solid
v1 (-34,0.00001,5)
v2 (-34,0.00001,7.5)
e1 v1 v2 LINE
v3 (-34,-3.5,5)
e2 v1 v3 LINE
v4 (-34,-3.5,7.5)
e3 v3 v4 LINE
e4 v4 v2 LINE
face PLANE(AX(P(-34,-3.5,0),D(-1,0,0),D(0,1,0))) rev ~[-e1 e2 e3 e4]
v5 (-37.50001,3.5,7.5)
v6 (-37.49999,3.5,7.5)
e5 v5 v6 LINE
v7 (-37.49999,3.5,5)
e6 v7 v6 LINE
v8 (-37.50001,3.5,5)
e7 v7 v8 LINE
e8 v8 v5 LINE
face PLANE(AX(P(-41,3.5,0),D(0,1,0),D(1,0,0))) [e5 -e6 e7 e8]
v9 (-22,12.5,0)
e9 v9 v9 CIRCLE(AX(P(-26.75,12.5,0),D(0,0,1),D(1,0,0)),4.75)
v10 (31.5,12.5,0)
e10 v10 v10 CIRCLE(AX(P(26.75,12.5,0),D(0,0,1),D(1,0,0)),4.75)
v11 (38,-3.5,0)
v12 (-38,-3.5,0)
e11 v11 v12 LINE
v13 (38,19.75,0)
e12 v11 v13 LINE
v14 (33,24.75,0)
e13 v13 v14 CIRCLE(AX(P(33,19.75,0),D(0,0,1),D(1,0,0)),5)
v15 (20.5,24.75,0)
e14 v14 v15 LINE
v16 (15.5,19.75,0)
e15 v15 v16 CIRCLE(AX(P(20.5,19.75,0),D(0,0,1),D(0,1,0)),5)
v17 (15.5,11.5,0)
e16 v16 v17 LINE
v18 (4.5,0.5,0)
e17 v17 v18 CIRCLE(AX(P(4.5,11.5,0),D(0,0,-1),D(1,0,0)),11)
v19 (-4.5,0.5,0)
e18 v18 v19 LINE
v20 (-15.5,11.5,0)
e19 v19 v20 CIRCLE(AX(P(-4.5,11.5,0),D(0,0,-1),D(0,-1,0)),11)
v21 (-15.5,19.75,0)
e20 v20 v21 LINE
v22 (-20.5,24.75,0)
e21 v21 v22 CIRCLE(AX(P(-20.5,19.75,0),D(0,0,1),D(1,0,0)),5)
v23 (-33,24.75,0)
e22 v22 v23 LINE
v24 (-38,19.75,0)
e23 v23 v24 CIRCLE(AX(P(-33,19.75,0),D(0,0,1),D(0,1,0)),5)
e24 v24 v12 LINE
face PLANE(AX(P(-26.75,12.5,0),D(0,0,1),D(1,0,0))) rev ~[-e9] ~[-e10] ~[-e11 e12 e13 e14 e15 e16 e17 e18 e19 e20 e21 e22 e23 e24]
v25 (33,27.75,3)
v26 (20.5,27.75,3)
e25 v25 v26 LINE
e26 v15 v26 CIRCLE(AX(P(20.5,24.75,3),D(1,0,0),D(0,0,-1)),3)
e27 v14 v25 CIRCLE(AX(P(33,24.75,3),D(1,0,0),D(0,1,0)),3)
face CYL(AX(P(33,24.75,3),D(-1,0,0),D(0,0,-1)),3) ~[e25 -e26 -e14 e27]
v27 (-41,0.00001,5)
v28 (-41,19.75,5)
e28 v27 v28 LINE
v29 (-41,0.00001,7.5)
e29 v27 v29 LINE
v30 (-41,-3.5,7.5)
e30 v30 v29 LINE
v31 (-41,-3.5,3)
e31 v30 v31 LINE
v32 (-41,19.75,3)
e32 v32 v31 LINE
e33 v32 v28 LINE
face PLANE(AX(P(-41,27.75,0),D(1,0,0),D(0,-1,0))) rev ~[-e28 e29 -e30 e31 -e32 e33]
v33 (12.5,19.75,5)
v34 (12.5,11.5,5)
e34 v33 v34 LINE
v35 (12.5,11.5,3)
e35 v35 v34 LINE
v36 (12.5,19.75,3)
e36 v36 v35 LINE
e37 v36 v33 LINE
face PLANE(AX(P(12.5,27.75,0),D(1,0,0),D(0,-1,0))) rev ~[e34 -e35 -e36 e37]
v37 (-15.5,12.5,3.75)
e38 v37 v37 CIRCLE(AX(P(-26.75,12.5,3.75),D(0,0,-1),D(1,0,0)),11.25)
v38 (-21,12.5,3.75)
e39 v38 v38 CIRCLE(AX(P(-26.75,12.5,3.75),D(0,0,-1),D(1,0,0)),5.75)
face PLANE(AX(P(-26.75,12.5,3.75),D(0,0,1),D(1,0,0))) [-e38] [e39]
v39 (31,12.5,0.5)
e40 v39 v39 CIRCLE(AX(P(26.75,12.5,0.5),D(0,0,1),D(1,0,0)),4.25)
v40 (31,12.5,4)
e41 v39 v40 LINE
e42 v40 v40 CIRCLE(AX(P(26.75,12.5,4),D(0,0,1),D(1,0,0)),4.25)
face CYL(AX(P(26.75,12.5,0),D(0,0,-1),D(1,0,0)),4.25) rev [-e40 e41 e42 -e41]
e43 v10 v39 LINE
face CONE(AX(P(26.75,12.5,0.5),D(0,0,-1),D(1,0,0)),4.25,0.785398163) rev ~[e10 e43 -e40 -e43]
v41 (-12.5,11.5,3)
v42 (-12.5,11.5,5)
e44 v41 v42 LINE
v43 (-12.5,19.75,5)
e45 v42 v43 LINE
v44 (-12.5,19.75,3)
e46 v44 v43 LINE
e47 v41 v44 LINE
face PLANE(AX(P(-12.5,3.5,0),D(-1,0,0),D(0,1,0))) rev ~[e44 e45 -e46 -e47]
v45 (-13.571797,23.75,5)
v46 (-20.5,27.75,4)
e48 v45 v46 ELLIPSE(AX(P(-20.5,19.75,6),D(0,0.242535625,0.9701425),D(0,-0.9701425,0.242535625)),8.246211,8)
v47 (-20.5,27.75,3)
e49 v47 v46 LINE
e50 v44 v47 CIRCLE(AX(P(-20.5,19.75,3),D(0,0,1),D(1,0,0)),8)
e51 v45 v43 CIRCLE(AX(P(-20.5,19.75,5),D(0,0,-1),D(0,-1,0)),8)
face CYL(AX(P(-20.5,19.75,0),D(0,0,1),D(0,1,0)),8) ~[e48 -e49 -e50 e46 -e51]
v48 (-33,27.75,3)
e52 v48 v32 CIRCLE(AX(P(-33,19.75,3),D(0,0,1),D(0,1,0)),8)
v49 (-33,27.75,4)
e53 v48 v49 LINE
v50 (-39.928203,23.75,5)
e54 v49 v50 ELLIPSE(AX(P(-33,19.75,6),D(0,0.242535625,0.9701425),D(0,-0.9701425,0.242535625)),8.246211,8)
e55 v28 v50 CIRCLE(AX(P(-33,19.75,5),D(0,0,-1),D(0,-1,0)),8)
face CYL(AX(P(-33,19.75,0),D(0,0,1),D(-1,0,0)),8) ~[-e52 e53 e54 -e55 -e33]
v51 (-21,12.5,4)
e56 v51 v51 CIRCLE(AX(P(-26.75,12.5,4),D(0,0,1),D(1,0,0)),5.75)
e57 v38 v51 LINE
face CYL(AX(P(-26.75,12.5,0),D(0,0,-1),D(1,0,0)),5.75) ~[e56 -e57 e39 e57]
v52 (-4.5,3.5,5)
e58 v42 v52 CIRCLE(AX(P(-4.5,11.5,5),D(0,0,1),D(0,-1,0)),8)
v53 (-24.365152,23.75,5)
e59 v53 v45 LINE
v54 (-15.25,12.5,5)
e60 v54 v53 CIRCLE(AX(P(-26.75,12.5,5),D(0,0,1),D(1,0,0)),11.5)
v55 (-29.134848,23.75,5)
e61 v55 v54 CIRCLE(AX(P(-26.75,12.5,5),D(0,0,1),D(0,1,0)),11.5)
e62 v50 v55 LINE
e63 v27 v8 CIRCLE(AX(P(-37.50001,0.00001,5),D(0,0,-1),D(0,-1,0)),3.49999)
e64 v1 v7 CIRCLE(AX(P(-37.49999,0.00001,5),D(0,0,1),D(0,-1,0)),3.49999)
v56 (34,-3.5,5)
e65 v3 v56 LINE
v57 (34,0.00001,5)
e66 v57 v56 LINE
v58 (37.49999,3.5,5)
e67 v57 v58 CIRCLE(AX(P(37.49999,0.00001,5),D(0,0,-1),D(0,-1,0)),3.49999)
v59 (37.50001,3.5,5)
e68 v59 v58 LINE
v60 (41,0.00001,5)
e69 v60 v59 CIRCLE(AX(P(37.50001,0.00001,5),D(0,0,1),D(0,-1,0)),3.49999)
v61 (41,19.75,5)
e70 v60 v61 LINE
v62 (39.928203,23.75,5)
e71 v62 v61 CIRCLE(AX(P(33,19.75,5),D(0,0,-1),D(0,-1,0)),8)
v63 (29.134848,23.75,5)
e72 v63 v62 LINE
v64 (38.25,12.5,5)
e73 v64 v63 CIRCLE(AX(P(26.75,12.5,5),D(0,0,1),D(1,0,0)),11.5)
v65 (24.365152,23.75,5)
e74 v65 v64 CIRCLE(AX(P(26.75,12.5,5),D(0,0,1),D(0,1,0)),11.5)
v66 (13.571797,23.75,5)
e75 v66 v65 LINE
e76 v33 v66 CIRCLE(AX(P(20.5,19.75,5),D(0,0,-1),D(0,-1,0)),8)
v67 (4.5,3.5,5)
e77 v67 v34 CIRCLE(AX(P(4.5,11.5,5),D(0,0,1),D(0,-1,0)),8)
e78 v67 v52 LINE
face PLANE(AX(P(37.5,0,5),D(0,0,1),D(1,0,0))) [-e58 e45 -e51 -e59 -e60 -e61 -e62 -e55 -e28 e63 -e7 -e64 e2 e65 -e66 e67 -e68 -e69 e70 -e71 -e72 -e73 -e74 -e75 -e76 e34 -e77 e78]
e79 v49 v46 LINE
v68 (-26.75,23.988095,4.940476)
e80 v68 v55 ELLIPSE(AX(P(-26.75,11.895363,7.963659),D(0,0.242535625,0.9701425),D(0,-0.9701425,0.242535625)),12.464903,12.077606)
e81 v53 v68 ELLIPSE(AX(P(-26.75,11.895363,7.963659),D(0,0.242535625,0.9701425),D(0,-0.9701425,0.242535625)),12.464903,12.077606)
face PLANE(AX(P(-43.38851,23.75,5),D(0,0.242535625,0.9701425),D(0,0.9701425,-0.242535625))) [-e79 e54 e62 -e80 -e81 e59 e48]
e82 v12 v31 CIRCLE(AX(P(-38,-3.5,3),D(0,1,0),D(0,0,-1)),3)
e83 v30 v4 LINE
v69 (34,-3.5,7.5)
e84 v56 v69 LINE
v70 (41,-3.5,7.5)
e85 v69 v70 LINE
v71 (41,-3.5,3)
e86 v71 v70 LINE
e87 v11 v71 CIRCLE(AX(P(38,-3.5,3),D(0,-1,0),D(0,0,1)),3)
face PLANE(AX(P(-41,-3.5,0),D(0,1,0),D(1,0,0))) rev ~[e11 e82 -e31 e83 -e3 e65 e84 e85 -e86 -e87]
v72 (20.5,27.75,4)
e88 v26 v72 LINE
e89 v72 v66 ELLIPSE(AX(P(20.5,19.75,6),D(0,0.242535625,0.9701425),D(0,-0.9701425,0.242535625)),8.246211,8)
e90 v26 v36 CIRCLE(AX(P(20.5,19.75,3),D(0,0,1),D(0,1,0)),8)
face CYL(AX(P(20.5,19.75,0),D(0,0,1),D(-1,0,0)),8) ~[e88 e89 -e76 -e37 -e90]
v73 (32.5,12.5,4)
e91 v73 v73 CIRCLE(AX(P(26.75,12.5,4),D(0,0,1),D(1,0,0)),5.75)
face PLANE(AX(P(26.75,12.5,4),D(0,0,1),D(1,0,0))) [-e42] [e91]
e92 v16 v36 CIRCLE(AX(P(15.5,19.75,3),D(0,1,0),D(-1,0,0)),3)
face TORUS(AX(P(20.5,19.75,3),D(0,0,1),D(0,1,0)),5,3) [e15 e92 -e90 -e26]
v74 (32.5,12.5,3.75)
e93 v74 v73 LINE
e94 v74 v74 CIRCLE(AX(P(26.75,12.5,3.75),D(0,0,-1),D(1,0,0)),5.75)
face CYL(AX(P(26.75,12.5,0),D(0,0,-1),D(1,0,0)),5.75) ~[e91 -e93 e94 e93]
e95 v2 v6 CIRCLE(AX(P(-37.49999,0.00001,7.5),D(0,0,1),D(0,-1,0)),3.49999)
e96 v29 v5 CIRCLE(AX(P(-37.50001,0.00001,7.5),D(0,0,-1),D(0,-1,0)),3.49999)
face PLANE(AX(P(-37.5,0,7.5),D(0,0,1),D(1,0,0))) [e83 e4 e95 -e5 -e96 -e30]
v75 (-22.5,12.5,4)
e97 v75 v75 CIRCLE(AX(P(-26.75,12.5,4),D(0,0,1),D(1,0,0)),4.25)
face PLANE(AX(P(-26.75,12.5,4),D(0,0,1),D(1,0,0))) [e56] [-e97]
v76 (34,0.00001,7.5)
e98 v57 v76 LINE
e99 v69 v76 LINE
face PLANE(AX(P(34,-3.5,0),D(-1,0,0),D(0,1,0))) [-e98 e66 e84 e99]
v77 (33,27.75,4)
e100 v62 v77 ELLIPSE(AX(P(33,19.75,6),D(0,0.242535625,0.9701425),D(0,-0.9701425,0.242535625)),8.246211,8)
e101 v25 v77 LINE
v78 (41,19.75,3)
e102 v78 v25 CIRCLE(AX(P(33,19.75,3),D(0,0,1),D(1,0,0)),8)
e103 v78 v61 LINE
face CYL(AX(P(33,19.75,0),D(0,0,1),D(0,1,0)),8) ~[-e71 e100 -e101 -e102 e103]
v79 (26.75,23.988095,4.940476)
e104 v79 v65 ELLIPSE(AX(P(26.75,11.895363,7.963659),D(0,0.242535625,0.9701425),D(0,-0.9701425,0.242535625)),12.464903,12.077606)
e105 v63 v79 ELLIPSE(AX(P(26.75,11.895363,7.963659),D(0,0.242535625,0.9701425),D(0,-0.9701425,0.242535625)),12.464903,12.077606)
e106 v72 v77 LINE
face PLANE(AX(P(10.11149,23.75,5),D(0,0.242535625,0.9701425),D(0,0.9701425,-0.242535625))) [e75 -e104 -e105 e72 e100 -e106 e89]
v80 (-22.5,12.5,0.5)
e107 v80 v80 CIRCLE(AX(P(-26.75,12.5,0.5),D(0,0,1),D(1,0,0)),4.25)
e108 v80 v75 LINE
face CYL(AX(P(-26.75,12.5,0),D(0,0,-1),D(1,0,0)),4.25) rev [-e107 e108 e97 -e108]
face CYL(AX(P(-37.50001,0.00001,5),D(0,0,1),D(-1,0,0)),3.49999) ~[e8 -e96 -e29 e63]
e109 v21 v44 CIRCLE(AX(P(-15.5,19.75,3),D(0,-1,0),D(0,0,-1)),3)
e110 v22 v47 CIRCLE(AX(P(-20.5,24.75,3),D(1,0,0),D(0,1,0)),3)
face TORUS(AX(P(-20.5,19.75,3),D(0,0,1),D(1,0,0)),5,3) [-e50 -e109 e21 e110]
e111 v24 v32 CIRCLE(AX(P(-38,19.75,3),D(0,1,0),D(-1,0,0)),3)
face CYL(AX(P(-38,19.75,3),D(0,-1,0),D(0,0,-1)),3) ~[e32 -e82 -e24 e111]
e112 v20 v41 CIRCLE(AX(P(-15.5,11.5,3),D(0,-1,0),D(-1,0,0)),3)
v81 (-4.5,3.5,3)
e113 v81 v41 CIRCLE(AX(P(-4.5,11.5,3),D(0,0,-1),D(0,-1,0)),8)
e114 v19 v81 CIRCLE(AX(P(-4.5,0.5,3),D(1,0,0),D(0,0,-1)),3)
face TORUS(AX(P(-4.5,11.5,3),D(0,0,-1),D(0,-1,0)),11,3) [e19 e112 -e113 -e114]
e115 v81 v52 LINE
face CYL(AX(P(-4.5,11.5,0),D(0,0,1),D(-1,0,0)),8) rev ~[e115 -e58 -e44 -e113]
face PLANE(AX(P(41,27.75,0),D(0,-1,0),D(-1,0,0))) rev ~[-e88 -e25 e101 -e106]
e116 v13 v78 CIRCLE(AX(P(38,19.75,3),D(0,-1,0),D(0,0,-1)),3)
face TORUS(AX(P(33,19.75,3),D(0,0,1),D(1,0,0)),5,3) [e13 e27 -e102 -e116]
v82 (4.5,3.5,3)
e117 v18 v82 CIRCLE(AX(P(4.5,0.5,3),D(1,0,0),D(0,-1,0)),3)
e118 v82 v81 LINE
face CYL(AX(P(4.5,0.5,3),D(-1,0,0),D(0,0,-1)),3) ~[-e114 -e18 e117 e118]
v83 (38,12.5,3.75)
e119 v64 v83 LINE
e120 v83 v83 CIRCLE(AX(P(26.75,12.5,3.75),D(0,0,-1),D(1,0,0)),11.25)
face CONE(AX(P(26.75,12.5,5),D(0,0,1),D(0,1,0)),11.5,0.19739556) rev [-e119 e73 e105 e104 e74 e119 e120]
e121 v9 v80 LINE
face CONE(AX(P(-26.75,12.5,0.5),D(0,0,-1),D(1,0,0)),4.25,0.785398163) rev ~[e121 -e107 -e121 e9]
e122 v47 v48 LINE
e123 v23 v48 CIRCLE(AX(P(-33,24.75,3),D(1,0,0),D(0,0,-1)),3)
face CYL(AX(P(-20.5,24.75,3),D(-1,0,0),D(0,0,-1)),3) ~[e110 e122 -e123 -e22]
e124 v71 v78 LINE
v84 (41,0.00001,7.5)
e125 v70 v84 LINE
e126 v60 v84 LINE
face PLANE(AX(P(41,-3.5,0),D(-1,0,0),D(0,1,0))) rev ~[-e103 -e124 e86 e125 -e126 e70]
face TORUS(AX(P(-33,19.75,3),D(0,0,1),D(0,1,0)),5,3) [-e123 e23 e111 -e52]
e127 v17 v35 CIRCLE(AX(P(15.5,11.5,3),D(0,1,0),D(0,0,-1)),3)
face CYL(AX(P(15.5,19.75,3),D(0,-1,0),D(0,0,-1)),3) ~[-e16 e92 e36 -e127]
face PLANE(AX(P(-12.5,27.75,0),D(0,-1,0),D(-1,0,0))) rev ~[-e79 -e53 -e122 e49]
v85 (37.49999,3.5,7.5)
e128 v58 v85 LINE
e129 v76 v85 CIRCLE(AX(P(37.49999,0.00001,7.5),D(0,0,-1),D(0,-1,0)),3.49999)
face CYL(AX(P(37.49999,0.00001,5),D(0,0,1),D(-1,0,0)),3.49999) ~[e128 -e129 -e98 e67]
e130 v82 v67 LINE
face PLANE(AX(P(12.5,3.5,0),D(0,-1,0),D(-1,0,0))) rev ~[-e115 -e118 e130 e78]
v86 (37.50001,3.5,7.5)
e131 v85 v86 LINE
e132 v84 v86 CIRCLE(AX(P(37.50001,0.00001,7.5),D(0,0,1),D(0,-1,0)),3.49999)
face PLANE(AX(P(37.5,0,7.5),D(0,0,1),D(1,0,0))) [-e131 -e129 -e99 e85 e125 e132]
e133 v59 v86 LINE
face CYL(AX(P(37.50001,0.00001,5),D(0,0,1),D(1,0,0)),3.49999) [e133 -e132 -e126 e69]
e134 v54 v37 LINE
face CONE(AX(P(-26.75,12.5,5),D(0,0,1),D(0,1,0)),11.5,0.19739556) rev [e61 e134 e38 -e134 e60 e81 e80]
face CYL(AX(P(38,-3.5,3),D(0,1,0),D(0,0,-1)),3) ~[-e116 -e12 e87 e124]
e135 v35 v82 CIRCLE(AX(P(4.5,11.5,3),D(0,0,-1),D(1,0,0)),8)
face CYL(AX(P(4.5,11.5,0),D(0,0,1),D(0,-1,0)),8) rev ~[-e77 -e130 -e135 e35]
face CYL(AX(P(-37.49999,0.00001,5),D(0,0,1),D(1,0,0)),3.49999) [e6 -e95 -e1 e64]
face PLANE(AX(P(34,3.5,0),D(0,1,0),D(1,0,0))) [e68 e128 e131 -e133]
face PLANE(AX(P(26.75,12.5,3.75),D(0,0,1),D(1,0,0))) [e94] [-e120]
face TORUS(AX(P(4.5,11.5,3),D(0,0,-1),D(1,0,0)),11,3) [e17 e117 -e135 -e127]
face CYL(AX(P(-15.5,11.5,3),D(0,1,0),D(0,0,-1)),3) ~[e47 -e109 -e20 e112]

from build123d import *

# Parameters (mm, degrees)
F0_W        = 7
F0_H        = 7
F0_R        = 11.25
F1_DEPTH    = 5
F0_R_2      = 5.75
F0_R_3      = 4.25
F2_DEPTH    = 3.75
F3_DEPTH    = 4
F4_DEPTH    = 7.5
F5_R        = 8
F6_T1_DEPTH = 33.2770199982
F6_T3_DEPTH = 33.2770199982
F7_R        = 3
F8_R        = 3.49999
F9_T2_ANGLE = 270
F9_T4_ANGLE = 270
F9_T6_ANGLE = 90
F9_T8_ANGLE = 90
F10_SIZE    = 0.5


# Not quite as in the source:
# - a fillet or chamfer that OpenCascade refuses, or shapes differently, is made with other operations: its cross-section is extruded or revolved along the edge and cut away or added
# - a fillet or chamfer is up to 0.001 mm smaller than in the source, because OpenCascade refuses the exact size


with BuildPart() as f1:
    # F0 (on Top) → F1 (new body)
    with BuildSketch(Plane.XY):
        with Locations((37.5, 0)):
            Rectangle(F0_W, F0_H)
        Polygon((-34, -3.5), (34, -3.5), (34, 3.5), (41, 3.5), (41, 27.75), (12.5, 27.75), (12.5, 3.5), (-12.5, 3.5), (-12.5, 27.75), (-41, 27.75), (-41, 3.5), (-34, 3.5), align=None)
        with Locations((-26.75, 12.5)):
            Circle(F0_R, mode=Mode.SUBTRACT)
        with Locations((26.75, 12.5)):
            Circle(F0_R, mode=Mode.SUBTRACT)
        with Locations((-37.5, 0)):
            Rectangle(F0_W, F0_H)
    extrude(amount=F1_DEPTH)

    # F0 (on Top) → F2 (join)
    with BuildSketch(Plane.XY):
        with Locations((-26.75, 12.5)):
            Circle(F0_R)
        with Locations((-26.75, 12.5)):
            Circle(F0_R_2, mode=Mode.SUBTRACT)
        with Locations((-26.75, 12.5)):
            Circle(F0_R_2)
        with Locations((-26.75, 12.5)):
            Circle(F0_R_3, mode=Mode.SUBTRACT)
        with Locations((26.75, 12.5)):
            Circle(F0_R)
        with Locations((26.75, 12.5)):
            Circle(F0_R_2, mode=Mode.SUBTRACT)
        with Locations((26.75, 12.5)):
            Circle(F0_R_2)
        with Locations((26.75, 12.5)):
            Circle(F0_R_3, mode=Mode.SUBTRACT)
    extrude(amount=F2_DEPTH)

    # F0 (on Top) → F3 (join)
    with BuildSketch(Plane.XY):
        with Locations((-26.75, 12.5)):
            Circle(F0_R_2)
        with Locations((-26.75, 12.5)):
            Circle(F0_R_3, mode=Mode.SUBTRACT)
        with Locations((26.75, 12.5)):
            Circle(F0_R_2)
        with Locations((26.75, 12.5)):
            Circle(F0_R_3, mode=Mode.SUBTRACT)
    extrude(amount=F3_DEPTH)

    # F0 (on Top) → F4 (join)
    with BuildSketch(Plane.XY):
        with Locations((-37.5, 0)):
            Rectangle(F0_W, F0_H)
        with Locations((37.5, 0)):
            Rectangle(F0_W, F0_H)
    extrude(amount=F4_DEPTH)

    # F5
    f5_edges = [f1.edges().sort_by_distance(p)[0] for p in [
        (-12.5, 3.5, 2.5),
        (12.5, 3.5, 2.5),
        (12.5, 27.75, 2.5),
        (41, 27.75, 2.5),
        (-41, 27.75, 2.5),
        (-12.5, 27.75, 2.5),
    ]]
    fillet(f5_edges, radius=F5_R)

    # F6: chamfer of 1 x 4 on 2 edges, made by hand

    # F6_s2 → F6_t1 (cut)
    with BuildSketch(Plane.YZ.offset(-43.3885099991)):
        Polygon((23.75, 5), (27.75, 4), (27.75, 5), align=None)
    extrude(amount=F6_T1_DEPTH, mode=Mode.SUBTRACT)

    # F6_s4 → F6_t3 (cut)
    with BuildSketch(Plane.YZ.offset(10.1114900009)):
        Polygon((23.75, 5), (27.75, 4), (27.75, 5), align=None)
    extrude(amount=F6_T3_DEPTH, mode=Mode.SUBTRACT)

    # F7
    f7_edges = [f1.edges().sort_by_distance(p)[0] for p in [
        (-26.75, 27.75, 0),
        (41, 8.125, 0),
        (38.656854, 25.406854, 0),
        (26.75, 27.75, 0),
        (-41, 8.125, 0),
        (14.843146, 25.406854, 0),
        (-38.656854, 25.406854, 0),
        (12.5, 15.625, 0),
        (10.156854, 5.843146, 0),
        (-14.843146, 25.406854, 0),
        (0, 3.5, 0),
        (-12.5, 15.625, 0),
        (-10.156854, 5.843146, 0),
    ]]
    fillet(f7_edges, radius=F7_R)

    # F8 (radius 3.5 in the source; OpenCascade refuses exactly that, so slightly less here)
    f8_edges = [f1.edges().sort_by_distance(p)[0] for p in [
        (-34, 3.5, 6.25),
        (-41, 3.5, 6.25),
        (34, 3.5, 6.25),
        (41, 3.5, 6.25),
    ]]
    fillet(f8_edges, radius=F8_R)

    # F9: chamfer of 1.25 x 0.25 on 4 edges, made by hand

    # F9_s1 → F9_t2 (revolve, cut)
    with BuildSketch(Plane.YZ.offset(-26.75)):
        Polygon((24, 5), (23.75, 3.75), (23.75, 5), align=None)
    revolve(axis=Axis((-26.75, 12.5, 5), (0, 0, 1)), revolution_arc=F9_T2_ANGLE, mode=Mode.SUBTRACT)

    # F9_s3 → F9_t4 (revolve, cut)
    with BuildSketch(Plane.YZ.offset(26.75)):
        Polygon((24, 5), (23.75, 3.75), (23.75, 5), align=None)
    revolve(axis=Axis((26.75, 12.5, 5), (0, 0, 1)), revolution_arc=F9_T4_ANGLE, mode=Mode.SUBTRACT)

    # F9_s5 → F9_t6 (revolve, cut)
    with BuildSketch(Plane.XZ.offset(-12.5)):
        Polygon((-15.25, 5), (-15.5, 3.75), (-15.5, 5), align=None)
    revolve(axis=Axis((-26.75, 12.5, 5), (0, 0, 1)), revolution_arc=F9_T6_ANGLE, mode=Mode.SUBTRACT)

    # F9_s7 → F9_t8 (revolve, cut)
    with BuildSketch(Plane.XZ.offset(-12.5)):
        Polygon((38.25, 5), (38, 3.75), (38, 5), align=None)
    revolve(axis=Axis((26.75, 12.5, 5), (0, 0, 1)), revolution_arc=F9_T8_ANGLE, mode=Mode.SUBTRACT)

    # F10
    f10_edges = [f1.edges().sort_by_distance(p)[0] for p in [
        (22.5, 12.5, 0),
        (-31, 12.5, 0),
    ]]
    chamfer(f10_edges, length=F10_SIZE)


solid = f1.part
